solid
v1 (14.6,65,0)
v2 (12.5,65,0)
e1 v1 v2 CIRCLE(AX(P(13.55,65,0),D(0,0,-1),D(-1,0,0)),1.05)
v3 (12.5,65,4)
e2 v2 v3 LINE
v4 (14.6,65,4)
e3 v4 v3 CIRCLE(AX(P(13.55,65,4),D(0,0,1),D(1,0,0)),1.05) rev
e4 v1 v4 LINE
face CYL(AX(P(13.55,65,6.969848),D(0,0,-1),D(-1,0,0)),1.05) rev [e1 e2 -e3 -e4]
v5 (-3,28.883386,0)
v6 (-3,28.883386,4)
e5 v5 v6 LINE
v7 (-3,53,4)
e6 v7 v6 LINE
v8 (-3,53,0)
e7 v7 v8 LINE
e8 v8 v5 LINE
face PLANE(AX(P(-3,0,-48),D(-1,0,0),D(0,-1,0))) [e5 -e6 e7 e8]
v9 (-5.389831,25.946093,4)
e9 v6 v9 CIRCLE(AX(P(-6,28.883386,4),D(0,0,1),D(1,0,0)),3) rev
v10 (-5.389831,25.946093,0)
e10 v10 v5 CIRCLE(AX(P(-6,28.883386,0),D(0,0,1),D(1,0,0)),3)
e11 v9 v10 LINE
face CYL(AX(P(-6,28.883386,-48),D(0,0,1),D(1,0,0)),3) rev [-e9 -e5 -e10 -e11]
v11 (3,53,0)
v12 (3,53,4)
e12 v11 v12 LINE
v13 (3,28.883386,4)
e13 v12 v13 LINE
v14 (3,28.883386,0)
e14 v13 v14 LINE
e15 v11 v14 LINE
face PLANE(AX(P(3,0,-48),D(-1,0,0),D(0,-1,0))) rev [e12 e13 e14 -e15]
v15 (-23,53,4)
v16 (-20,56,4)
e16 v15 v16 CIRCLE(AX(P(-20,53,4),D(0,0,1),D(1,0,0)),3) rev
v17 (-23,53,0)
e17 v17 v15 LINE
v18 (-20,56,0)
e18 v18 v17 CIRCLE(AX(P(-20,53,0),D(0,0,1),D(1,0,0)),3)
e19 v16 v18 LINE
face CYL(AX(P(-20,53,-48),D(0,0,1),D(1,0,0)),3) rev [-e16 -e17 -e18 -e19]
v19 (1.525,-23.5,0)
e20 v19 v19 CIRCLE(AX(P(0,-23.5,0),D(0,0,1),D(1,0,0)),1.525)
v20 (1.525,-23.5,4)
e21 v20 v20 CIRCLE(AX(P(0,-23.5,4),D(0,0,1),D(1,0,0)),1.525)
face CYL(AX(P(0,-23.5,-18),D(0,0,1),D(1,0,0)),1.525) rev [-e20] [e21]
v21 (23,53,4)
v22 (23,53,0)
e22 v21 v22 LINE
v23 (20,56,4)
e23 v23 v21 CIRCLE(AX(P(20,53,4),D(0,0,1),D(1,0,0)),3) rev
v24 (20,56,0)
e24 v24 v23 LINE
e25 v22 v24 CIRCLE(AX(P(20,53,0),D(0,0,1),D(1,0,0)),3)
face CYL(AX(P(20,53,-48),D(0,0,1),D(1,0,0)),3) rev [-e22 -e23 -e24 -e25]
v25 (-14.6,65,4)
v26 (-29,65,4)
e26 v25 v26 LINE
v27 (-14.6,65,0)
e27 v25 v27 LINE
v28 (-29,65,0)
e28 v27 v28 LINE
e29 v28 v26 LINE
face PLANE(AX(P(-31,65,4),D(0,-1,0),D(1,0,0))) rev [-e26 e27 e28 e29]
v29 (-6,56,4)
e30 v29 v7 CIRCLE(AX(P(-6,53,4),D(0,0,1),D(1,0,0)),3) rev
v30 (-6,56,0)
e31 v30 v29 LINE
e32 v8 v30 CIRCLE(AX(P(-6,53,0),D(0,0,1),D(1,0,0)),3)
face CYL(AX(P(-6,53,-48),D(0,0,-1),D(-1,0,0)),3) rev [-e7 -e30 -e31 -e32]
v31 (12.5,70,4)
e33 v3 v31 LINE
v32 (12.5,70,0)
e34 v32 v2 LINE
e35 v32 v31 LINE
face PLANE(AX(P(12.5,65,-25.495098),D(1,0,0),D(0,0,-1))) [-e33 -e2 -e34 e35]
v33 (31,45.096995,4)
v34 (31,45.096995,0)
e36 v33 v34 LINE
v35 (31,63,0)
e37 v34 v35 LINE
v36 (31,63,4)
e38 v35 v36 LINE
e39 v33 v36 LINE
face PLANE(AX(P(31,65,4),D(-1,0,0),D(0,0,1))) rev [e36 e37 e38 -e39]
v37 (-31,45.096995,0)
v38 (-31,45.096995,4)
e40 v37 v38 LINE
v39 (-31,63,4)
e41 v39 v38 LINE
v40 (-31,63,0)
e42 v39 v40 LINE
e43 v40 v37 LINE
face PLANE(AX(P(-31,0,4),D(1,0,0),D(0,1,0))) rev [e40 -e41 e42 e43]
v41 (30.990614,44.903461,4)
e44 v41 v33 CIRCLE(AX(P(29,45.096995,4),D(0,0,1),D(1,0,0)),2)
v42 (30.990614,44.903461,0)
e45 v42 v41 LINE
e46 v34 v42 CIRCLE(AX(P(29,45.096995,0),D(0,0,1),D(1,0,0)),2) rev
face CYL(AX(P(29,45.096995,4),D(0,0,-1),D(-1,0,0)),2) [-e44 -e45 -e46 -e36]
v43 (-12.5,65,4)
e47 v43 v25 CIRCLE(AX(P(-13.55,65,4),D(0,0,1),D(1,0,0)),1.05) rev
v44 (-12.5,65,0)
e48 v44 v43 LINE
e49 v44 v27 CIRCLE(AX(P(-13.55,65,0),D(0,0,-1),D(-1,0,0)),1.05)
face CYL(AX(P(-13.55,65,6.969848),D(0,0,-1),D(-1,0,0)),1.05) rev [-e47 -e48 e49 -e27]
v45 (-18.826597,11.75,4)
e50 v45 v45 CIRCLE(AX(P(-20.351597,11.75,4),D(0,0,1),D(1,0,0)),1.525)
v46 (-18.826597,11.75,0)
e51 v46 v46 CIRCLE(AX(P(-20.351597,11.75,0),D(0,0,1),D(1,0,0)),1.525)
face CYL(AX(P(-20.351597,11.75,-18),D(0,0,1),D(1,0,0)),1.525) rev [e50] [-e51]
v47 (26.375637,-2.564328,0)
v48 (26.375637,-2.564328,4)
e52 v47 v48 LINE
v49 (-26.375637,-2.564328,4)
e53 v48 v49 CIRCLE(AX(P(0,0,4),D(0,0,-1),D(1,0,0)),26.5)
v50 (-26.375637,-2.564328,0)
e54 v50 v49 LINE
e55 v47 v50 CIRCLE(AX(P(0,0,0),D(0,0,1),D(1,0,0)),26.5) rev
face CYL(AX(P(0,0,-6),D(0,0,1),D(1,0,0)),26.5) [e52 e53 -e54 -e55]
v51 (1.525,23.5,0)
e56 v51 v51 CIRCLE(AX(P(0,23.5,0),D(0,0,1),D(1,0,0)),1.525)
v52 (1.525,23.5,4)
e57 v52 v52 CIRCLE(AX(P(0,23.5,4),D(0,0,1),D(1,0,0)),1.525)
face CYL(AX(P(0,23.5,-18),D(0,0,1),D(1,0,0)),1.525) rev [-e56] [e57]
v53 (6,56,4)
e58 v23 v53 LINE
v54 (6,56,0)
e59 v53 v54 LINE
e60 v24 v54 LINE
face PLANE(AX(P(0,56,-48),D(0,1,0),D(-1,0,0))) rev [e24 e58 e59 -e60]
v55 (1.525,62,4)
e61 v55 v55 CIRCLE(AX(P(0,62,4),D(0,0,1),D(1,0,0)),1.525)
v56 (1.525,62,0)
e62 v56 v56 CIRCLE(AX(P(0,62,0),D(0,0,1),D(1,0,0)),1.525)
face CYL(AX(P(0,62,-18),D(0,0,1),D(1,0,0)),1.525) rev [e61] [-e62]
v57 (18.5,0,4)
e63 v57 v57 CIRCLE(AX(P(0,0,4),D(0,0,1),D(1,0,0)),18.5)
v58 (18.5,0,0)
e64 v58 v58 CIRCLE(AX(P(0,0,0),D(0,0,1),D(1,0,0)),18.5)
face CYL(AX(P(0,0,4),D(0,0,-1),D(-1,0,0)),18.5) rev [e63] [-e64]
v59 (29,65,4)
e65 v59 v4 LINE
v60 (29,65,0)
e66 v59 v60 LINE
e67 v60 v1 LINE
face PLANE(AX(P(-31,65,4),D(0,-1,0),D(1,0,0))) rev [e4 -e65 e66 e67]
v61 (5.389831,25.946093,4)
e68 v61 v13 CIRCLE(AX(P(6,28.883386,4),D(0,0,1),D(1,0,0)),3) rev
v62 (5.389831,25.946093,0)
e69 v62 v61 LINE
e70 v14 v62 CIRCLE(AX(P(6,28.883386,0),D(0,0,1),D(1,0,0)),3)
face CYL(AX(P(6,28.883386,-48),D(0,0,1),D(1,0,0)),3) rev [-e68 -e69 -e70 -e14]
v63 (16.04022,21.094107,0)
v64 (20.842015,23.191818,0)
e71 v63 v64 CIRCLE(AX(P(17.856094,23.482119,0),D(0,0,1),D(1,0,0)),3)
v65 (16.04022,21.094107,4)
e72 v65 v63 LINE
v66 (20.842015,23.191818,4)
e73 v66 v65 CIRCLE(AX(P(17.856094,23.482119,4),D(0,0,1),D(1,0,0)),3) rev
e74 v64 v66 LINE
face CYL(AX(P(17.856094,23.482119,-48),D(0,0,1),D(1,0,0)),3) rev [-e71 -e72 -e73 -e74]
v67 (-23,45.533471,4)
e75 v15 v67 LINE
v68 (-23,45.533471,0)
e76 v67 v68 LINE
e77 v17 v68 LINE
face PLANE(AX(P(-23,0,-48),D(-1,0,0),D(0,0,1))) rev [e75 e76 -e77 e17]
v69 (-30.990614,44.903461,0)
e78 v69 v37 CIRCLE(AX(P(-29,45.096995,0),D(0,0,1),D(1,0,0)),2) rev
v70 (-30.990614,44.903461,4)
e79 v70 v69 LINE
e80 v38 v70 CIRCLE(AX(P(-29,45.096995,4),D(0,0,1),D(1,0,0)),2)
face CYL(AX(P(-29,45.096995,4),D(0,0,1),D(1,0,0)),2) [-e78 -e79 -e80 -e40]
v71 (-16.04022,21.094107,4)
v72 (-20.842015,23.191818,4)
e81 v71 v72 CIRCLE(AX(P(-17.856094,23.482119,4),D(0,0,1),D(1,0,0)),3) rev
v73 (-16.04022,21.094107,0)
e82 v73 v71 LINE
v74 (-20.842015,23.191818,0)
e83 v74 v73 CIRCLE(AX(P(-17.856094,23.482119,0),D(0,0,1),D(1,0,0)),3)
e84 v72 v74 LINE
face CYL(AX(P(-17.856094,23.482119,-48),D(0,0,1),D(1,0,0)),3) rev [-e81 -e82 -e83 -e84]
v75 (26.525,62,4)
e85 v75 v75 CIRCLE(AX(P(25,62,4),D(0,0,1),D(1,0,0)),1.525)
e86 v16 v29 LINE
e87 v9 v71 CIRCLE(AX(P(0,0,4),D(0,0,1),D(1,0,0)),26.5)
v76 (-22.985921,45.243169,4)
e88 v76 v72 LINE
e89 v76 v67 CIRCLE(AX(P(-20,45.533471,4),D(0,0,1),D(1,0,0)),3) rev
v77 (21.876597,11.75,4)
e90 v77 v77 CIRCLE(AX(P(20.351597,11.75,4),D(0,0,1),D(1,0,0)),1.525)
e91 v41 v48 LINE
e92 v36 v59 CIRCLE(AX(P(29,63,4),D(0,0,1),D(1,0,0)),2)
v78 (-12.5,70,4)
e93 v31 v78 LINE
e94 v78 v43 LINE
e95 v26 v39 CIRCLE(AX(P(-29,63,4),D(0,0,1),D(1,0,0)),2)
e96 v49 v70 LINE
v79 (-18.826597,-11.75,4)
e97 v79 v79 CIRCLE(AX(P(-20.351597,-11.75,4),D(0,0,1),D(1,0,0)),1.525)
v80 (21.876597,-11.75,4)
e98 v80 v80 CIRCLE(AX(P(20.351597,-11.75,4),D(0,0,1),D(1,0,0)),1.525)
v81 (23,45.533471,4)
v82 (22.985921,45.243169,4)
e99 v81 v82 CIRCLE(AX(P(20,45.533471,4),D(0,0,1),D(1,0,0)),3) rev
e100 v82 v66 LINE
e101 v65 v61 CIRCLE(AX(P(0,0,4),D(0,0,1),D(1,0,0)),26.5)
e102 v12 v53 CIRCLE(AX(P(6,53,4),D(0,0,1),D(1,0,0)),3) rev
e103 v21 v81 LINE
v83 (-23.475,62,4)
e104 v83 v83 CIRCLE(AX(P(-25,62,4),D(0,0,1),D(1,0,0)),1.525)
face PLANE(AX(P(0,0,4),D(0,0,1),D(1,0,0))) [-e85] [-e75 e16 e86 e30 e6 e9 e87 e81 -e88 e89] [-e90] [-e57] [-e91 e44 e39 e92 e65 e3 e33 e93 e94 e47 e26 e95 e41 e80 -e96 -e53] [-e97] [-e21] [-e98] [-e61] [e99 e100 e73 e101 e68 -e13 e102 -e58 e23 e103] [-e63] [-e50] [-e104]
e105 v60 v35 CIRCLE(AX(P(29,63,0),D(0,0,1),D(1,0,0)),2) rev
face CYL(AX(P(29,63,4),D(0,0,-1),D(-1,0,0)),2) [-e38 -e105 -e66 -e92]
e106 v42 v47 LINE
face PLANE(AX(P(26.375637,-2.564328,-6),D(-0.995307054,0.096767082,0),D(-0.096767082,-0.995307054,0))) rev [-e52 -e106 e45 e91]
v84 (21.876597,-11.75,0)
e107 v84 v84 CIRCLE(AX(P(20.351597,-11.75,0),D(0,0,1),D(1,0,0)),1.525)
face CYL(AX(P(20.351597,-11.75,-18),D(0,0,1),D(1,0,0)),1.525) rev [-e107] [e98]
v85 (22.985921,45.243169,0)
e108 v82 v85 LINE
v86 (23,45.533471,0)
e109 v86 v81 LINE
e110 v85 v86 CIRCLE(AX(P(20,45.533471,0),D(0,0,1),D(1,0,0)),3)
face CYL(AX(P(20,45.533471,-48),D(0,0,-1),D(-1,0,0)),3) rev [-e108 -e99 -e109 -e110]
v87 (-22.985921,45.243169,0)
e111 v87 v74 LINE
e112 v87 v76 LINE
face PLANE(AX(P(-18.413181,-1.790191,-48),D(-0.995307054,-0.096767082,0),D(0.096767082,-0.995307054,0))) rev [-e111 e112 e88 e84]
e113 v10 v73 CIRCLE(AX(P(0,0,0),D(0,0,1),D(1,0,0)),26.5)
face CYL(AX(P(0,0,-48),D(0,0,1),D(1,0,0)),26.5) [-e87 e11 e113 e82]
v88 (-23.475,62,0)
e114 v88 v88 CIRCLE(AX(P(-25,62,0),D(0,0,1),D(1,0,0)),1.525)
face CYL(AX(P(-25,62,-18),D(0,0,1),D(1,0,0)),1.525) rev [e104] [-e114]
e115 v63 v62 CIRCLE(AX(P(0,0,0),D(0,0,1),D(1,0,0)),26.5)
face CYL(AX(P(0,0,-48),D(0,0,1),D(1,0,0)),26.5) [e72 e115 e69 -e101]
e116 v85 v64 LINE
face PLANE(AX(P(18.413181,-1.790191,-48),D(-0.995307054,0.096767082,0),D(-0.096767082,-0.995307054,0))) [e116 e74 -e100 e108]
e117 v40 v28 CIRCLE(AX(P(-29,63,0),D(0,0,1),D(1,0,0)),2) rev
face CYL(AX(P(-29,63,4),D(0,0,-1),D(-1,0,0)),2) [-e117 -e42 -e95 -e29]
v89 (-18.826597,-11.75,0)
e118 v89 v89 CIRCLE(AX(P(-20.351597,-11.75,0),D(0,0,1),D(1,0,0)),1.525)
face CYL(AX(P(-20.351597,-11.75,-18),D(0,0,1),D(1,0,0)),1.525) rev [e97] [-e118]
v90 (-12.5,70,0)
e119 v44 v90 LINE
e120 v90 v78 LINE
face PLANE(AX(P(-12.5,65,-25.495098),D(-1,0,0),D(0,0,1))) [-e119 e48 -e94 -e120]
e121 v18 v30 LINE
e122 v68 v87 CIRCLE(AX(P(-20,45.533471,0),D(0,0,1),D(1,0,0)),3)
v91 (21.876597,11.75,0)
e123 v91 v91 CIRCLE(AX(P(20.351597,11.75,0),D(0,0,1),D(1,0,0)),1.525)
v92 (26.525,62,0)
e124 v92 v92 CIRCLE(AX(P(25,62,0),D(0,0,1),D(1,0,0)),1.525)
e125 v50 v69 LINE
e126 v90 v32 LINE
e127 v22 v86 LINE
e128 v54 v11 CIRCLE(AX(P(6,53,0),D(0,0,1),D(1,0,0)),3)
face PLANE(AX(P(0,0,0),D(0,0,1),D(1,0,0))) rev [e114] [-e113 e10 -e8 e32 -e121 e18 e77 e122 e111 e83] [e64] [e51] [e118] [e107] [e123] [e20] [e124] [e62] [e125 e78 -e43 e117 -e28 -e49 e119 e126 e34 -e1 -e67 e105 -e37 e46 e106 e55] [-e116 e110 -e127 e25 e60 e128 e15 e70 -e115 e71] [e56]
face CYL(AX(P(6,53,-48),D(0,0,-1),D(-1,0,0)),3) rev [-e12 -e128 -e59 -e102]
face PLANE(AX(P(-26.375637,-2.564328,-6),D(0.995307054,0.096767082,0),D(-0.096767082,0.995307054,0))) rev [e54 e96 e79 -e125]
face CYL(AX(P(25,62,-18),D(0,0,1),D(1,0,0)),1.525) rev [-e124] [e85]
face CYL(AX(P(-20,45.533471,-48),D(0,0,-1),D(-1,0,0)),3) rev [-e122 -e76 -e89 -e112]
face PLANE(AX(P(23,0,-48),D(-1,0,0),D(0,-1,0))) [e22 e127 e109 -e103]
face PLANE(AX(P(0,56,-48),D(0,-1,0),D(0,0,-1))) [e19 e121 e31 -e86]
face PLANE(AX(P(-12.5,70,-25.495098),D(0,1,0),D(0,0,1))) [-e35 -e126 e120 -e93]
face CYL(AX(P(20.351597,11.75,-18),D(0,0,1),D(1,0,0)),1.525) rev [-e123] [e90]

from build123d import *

# Parameters (mm, degrees)
SKETCH_1_R          = 18.5
EXTRUDE_1_DEPTH     = 4
CUT_EXTRUDE_1_DEPTH = 10
SKETCH_3_R          = 1.525
CUT_EXTRUDE_2_DEPTH = 22
SKETCH_4_R          = 1.525
CUT_EXTRUDE_3_DEPTH = 22
FILLET_1_R          = 2
SKETCH_5_W          = 25
SKETCH_5_H          = 5
EXTRUDE_2_DEPTH     = 4
SKETCH_6_R          = 1.05
CUT_EXTRUDE_4_DEPTH = 4
CUT_EXTRUDE_5_DEPTH = 52
FILLET_3_R          = 3


with BuildPart() as part:
    # 草图1 → 凸台-拉伸1 (new body)
    with BuildSketch(Plane.XY):
        with BuildLine():
            Line((-31, 0), (-31, 65))
            Line((-31, 65), (31, 65))
            Line((31, 65), (31, 0))
            ThreePointArc((31, 0), (0, -31), (-31, 0))
        make_face()
        Circle(SKETCH_1_R, mode=Mode.SUBTRACT)
    extrude(amount=EXTRUDE_1_DEPTH)

    # 草图2 → 切除-拉伸1 (cut)
    with BuildSketch(Plane.XY.offset(4)):
        with BuildLine():
            Line((-26.375636933, -2.564327665), (-31, 45))
            Line((-31, 45), (-31, -32))
            Line((-31, -32), (31, -32))
            Line((31, -32), (31, 45))
            Line((31, 45), (26.375636933, -2.564327665))
            ThreePointArc((26.375636933, -2.564327665), (0, -26.5), (-26.375636933, -2.564327665))
        make_face()
    extrude(amount=-CUT_EXTRUDE_1_DEPTH, mode=Mode.SUBTRACT)

    # 草图3 → 切除-拉伸2 (cut)
    with BuildSketch(Plane.XY.offset(4)):
        with Locations((0, 23.5)):
            Circle(SKETCH_3_R)
        with Locations((20.351596989, 11.75)):
            Circle(SKETCH_3_R)
        with Locations((20.351596989, -11.75)):
            Circle(SKETCH_3_R)
        with Locations((0, -23.5)):
            Circle(SKETCH_3_R)
        with Locations((-20.351596989, -11.75)):
            Circle(SKETCH_3_R)
        with Locations((-20.351596989, 11.75)):
            Circle(SKETCH_3_R)
    extrude(amount=-CUT_EXTRUDE_2_DEPTH, mode=Mode.SUBTRACT)

    # 草图4 → 切除-拉伸3 (cut)
    with BuildSketch(Plane.XY.offset(4)):
        with Locations((25, 62)):
            Circle(SKETCH_4_R)
        with Locations((0, 62)):
            Circle(SKETCH_4_R)
        with Locations((-25, 62)):
            Circle(SKETCH_4_R)
    extrude(amount=-CUT_EXTRUDE_3_DEPTH, mode=Mode.SUBTRACT)

    # 圆角1
    # the kernel refuses this fillet: 2 mm, written as the material it takes off along each edge
    with BuildSketch(Plane(origin=(-31, 45, 4.242486693), x_dir=(0, 1, 0), z_dir=(0, 0, -1)), Plane(origin=(31, 45, 4.242486693), x_dir=(-0.09676708169889991, -0.9953070540790306, 0), z_dir=(0, 0, -1))) as fillet_1_piece_1:
        with BuildLine():
            CenterArc((FILLET_1_R * 0.048497338543, FILLET_1_R), FILLET_1_R, 264.446965205, 5.553034795)
            Line((-FILLET_1_R * 0.0482697431559, FILLET_1_R * 0.00469294592097), (0, 0))
            Line((0, 0), (FILLET_1_R * 0.048497338543, 0))
        make_face()
    extrude(amount=4.484973385, mode=Mode.SUBTRACT)
    with BuildSketch(Plane(origin=(-31, 65, -5), x_dir=(0, -1, 0), z_dir=(0, 0, 1)), Plane(origin=(31, 65, -5), x_dir=(-1, 0, 0), z_dir=(0, 0, 1))) as fillet_1_piece_2:
        with BuildLine():
            CenterArc((FILLET_1_R, FILLET_1_R), FILLET_1_R, 180, 90)
            Line((0, FILLET_1_R), (0, 0))
            Line((0, 0), (FILLET_1_R, 0))
        make_face()
    extrude(amount=14, mode=Mode.SUBTRACT)

    # 草图5 → 凸台-拉伸2 (add)
    with BuildSketch(Plane.XY.offset(4)):
        with Locations((0, 67.5)):
            Rectangle(SKETCH_5_W, SKETCH_5_H)
    extrude(amount=-EXTRUDE_2_DEPTH)

    # 草图6 → 切除-拉伸4 (cut)
    with BuildSketch(Plane(origin=(0, 0, 0), x_dir=(-1, 0, 0), z_dir=(0, 0, -1))):
        with Locations((13.55, 65)):
            Circle(SKETCH_6_R)
        with Locations((-13.55, 65)):
            Circle(SKETCH_6_R)
    extrude(amount=-CUT_EXTRUDE_4_DEPTH, mode=Mode.SUBTRACT)

    # 草图7 → 切除-拉伸5 (cut)
    with BuildSketch(Plane.XY.offset(4)):
        with BuildLine():
            Line((-3, 26.329641091), (-3, 56))
            Line((-3, 56), (-23, 56))
            Line((-23, 56), (-23, 45.387978708))
            Line((-23, 45.387978708), (-20.249206785, 17.094432561))
            ThreePointArc((-20.249206785, 17.094432561), (-12.508144274, 23.362284281), (-3, 26.329641091))
        make_face()
        with BuildLine():
            Line((3, 56), (3, 26.329641091))
            ThreePointArc((3, 26.329641091), (12.508144274, 23.362284281), (20.249206785, 17.094432561))
            Line((20.249206785, 17.094432561), (23, 45.387978708))
            Line((23, 45.387978708), (23, 56))
            Line((23, 56), (3, 56))
        make_face()
    extrude(amount=-CUT_EXTRUDE_5_DEPTH, mode=Mode.SUBTRACT)

    # 圆角3
    # the kernel refuses this fillet: 3 mm, written as the material it adds along each edge
    with BuildSketch(Plane(origin=(-3, 26.329641091, 4), x_dir=(0, 1, 0), z_dir=(0, 0, -1))) as fillet_3_piece_1:
        with BuildLine():
            CenterArc((2.553745137, -3), FILLET_3_R, 90, 78.264742526)
            ThreePointArc((-0.383548378, -2.389830508), (-0.164475151, -1.199296528), (0, 0))
            Line((0, 0), (2.553745137, 0))
        make_face()
    extrude(amount=4)
    with BuildSketch(Plane(origin=(-20.249206785, 17.094432561, 4), x_dir=(0.7249016624604615, 0.6888523642712269, 0), z_dir=(0, 0, -1))) as fillet_3_piece_2:
        with BuildLine():
            CenterArc((6.134944493, -2.981943006), FILLET_3_R, 96.289524431, 121.69677285)
            Line((3.770470579, -4.828362003), (0, 0))
            ThreePointArc((0, 0), (2.903143376, -0.159503449), (5.806286752, 0))
        make_face()
    extrude(amount=4)
    with BuildSketch(Plane(origin=(-23, 45.387978708, 4), x_dir=(0.09676708169889287, -0.9953070540790314, 0), z_dir=(0, 0, -1)), Plane(origin=(23, 45.387978708, 4), x_dir=(0, 1, 0), z_dir=(0, 0, -1))) as fillet_3_piece_3:
        with BuildLine():
            CenterArc((FILLET_3_R * 0.048497338543, -FILLET_3_R), FILLET_3_R, 90, 5.553034795)
            Line((-FILLET_3_R * 0.0482697431559, -FILLET_3_R * 0.00469294592097), (0, 0))
            Line((0, 0), (FILLET_3_R * 0.048497338543, 0))
        make_face()
    extrude(amount=4)
    with BuildSketch(Plane(origin=(-23, 56, 4), x_dir=(0, -1, 0), z_dir=(0, 0, -1)), Plane(origin=(3, 56, 4), x_dir=(0, -1, 0), z_dir=(0, 0, -1)), Plane(origin=(23, 56, 4), x_dir=(-1, 0, 0), z_dir=(0, 0, -1))) as fillet_3_piece_4:
        with BuildLine():
            CenterArc((FILLET_3_R, -FILLET_3_R), FILLET_3_R, 90, 90)
            Line((0, -FILLET_3_R), (0, 0))
            Line((0, 0), (FILLET_3_R, 0))
        make_face()
    extrude(amount=4)
    with BuildSketch(Plane(origin=(-3, 56, 4), x_dir=(0, -1, 0), z_dir=(0, 0, -1))) as fillet_3_piece_5:
        with BuildLine():
            CenterArc((FILLET_3_R, FILLET_3_R), FILLET_3_R, 180, 90)
            Line((0, FILLET_3_R), (0, 0))
            Line((0, 0), (FILLET_3_R, 0))
        make_face()
    extrude(amount=4)
    with BuildSketch(Plane(origin=(20.249206785, 17.094432561, 4), x_dir=(0.09676708169888887, 0.9953070540790317, 0), z_dir=(0, 0, -1))) as fillet_3_piece_6:
        with BuildLine():
            CenterArc((6.126134835, -3), FILLET_3_R, 90, 121.69677285)
            ThreePointArc((3.57361272, -4.576271186), (1.912520275, -2.189965527), (0, 0))
            Line((0, 0), (6.126134835, 0))
        make_face()
    extrude(amount=4)
    with BuildSketch(Plane(origin=(3, 26.329641091, 4), x_dir=(0, 1, 0), z_dir=(0, 0, -1))) as fillet_3_piece_7:
        with BuildLine():
            CenterArc((2.553745137, 3), FILLET_3_R, 191.735257474, 78.264742526)
            ThreePointArc((-0.383548378, 2.389830508), (-0.164475151, 1.199296528), (0, 0))
            Line((0, 0), (2.553745137, 0))
        make_face()
    extrude(amount=4)


solid = part.part
